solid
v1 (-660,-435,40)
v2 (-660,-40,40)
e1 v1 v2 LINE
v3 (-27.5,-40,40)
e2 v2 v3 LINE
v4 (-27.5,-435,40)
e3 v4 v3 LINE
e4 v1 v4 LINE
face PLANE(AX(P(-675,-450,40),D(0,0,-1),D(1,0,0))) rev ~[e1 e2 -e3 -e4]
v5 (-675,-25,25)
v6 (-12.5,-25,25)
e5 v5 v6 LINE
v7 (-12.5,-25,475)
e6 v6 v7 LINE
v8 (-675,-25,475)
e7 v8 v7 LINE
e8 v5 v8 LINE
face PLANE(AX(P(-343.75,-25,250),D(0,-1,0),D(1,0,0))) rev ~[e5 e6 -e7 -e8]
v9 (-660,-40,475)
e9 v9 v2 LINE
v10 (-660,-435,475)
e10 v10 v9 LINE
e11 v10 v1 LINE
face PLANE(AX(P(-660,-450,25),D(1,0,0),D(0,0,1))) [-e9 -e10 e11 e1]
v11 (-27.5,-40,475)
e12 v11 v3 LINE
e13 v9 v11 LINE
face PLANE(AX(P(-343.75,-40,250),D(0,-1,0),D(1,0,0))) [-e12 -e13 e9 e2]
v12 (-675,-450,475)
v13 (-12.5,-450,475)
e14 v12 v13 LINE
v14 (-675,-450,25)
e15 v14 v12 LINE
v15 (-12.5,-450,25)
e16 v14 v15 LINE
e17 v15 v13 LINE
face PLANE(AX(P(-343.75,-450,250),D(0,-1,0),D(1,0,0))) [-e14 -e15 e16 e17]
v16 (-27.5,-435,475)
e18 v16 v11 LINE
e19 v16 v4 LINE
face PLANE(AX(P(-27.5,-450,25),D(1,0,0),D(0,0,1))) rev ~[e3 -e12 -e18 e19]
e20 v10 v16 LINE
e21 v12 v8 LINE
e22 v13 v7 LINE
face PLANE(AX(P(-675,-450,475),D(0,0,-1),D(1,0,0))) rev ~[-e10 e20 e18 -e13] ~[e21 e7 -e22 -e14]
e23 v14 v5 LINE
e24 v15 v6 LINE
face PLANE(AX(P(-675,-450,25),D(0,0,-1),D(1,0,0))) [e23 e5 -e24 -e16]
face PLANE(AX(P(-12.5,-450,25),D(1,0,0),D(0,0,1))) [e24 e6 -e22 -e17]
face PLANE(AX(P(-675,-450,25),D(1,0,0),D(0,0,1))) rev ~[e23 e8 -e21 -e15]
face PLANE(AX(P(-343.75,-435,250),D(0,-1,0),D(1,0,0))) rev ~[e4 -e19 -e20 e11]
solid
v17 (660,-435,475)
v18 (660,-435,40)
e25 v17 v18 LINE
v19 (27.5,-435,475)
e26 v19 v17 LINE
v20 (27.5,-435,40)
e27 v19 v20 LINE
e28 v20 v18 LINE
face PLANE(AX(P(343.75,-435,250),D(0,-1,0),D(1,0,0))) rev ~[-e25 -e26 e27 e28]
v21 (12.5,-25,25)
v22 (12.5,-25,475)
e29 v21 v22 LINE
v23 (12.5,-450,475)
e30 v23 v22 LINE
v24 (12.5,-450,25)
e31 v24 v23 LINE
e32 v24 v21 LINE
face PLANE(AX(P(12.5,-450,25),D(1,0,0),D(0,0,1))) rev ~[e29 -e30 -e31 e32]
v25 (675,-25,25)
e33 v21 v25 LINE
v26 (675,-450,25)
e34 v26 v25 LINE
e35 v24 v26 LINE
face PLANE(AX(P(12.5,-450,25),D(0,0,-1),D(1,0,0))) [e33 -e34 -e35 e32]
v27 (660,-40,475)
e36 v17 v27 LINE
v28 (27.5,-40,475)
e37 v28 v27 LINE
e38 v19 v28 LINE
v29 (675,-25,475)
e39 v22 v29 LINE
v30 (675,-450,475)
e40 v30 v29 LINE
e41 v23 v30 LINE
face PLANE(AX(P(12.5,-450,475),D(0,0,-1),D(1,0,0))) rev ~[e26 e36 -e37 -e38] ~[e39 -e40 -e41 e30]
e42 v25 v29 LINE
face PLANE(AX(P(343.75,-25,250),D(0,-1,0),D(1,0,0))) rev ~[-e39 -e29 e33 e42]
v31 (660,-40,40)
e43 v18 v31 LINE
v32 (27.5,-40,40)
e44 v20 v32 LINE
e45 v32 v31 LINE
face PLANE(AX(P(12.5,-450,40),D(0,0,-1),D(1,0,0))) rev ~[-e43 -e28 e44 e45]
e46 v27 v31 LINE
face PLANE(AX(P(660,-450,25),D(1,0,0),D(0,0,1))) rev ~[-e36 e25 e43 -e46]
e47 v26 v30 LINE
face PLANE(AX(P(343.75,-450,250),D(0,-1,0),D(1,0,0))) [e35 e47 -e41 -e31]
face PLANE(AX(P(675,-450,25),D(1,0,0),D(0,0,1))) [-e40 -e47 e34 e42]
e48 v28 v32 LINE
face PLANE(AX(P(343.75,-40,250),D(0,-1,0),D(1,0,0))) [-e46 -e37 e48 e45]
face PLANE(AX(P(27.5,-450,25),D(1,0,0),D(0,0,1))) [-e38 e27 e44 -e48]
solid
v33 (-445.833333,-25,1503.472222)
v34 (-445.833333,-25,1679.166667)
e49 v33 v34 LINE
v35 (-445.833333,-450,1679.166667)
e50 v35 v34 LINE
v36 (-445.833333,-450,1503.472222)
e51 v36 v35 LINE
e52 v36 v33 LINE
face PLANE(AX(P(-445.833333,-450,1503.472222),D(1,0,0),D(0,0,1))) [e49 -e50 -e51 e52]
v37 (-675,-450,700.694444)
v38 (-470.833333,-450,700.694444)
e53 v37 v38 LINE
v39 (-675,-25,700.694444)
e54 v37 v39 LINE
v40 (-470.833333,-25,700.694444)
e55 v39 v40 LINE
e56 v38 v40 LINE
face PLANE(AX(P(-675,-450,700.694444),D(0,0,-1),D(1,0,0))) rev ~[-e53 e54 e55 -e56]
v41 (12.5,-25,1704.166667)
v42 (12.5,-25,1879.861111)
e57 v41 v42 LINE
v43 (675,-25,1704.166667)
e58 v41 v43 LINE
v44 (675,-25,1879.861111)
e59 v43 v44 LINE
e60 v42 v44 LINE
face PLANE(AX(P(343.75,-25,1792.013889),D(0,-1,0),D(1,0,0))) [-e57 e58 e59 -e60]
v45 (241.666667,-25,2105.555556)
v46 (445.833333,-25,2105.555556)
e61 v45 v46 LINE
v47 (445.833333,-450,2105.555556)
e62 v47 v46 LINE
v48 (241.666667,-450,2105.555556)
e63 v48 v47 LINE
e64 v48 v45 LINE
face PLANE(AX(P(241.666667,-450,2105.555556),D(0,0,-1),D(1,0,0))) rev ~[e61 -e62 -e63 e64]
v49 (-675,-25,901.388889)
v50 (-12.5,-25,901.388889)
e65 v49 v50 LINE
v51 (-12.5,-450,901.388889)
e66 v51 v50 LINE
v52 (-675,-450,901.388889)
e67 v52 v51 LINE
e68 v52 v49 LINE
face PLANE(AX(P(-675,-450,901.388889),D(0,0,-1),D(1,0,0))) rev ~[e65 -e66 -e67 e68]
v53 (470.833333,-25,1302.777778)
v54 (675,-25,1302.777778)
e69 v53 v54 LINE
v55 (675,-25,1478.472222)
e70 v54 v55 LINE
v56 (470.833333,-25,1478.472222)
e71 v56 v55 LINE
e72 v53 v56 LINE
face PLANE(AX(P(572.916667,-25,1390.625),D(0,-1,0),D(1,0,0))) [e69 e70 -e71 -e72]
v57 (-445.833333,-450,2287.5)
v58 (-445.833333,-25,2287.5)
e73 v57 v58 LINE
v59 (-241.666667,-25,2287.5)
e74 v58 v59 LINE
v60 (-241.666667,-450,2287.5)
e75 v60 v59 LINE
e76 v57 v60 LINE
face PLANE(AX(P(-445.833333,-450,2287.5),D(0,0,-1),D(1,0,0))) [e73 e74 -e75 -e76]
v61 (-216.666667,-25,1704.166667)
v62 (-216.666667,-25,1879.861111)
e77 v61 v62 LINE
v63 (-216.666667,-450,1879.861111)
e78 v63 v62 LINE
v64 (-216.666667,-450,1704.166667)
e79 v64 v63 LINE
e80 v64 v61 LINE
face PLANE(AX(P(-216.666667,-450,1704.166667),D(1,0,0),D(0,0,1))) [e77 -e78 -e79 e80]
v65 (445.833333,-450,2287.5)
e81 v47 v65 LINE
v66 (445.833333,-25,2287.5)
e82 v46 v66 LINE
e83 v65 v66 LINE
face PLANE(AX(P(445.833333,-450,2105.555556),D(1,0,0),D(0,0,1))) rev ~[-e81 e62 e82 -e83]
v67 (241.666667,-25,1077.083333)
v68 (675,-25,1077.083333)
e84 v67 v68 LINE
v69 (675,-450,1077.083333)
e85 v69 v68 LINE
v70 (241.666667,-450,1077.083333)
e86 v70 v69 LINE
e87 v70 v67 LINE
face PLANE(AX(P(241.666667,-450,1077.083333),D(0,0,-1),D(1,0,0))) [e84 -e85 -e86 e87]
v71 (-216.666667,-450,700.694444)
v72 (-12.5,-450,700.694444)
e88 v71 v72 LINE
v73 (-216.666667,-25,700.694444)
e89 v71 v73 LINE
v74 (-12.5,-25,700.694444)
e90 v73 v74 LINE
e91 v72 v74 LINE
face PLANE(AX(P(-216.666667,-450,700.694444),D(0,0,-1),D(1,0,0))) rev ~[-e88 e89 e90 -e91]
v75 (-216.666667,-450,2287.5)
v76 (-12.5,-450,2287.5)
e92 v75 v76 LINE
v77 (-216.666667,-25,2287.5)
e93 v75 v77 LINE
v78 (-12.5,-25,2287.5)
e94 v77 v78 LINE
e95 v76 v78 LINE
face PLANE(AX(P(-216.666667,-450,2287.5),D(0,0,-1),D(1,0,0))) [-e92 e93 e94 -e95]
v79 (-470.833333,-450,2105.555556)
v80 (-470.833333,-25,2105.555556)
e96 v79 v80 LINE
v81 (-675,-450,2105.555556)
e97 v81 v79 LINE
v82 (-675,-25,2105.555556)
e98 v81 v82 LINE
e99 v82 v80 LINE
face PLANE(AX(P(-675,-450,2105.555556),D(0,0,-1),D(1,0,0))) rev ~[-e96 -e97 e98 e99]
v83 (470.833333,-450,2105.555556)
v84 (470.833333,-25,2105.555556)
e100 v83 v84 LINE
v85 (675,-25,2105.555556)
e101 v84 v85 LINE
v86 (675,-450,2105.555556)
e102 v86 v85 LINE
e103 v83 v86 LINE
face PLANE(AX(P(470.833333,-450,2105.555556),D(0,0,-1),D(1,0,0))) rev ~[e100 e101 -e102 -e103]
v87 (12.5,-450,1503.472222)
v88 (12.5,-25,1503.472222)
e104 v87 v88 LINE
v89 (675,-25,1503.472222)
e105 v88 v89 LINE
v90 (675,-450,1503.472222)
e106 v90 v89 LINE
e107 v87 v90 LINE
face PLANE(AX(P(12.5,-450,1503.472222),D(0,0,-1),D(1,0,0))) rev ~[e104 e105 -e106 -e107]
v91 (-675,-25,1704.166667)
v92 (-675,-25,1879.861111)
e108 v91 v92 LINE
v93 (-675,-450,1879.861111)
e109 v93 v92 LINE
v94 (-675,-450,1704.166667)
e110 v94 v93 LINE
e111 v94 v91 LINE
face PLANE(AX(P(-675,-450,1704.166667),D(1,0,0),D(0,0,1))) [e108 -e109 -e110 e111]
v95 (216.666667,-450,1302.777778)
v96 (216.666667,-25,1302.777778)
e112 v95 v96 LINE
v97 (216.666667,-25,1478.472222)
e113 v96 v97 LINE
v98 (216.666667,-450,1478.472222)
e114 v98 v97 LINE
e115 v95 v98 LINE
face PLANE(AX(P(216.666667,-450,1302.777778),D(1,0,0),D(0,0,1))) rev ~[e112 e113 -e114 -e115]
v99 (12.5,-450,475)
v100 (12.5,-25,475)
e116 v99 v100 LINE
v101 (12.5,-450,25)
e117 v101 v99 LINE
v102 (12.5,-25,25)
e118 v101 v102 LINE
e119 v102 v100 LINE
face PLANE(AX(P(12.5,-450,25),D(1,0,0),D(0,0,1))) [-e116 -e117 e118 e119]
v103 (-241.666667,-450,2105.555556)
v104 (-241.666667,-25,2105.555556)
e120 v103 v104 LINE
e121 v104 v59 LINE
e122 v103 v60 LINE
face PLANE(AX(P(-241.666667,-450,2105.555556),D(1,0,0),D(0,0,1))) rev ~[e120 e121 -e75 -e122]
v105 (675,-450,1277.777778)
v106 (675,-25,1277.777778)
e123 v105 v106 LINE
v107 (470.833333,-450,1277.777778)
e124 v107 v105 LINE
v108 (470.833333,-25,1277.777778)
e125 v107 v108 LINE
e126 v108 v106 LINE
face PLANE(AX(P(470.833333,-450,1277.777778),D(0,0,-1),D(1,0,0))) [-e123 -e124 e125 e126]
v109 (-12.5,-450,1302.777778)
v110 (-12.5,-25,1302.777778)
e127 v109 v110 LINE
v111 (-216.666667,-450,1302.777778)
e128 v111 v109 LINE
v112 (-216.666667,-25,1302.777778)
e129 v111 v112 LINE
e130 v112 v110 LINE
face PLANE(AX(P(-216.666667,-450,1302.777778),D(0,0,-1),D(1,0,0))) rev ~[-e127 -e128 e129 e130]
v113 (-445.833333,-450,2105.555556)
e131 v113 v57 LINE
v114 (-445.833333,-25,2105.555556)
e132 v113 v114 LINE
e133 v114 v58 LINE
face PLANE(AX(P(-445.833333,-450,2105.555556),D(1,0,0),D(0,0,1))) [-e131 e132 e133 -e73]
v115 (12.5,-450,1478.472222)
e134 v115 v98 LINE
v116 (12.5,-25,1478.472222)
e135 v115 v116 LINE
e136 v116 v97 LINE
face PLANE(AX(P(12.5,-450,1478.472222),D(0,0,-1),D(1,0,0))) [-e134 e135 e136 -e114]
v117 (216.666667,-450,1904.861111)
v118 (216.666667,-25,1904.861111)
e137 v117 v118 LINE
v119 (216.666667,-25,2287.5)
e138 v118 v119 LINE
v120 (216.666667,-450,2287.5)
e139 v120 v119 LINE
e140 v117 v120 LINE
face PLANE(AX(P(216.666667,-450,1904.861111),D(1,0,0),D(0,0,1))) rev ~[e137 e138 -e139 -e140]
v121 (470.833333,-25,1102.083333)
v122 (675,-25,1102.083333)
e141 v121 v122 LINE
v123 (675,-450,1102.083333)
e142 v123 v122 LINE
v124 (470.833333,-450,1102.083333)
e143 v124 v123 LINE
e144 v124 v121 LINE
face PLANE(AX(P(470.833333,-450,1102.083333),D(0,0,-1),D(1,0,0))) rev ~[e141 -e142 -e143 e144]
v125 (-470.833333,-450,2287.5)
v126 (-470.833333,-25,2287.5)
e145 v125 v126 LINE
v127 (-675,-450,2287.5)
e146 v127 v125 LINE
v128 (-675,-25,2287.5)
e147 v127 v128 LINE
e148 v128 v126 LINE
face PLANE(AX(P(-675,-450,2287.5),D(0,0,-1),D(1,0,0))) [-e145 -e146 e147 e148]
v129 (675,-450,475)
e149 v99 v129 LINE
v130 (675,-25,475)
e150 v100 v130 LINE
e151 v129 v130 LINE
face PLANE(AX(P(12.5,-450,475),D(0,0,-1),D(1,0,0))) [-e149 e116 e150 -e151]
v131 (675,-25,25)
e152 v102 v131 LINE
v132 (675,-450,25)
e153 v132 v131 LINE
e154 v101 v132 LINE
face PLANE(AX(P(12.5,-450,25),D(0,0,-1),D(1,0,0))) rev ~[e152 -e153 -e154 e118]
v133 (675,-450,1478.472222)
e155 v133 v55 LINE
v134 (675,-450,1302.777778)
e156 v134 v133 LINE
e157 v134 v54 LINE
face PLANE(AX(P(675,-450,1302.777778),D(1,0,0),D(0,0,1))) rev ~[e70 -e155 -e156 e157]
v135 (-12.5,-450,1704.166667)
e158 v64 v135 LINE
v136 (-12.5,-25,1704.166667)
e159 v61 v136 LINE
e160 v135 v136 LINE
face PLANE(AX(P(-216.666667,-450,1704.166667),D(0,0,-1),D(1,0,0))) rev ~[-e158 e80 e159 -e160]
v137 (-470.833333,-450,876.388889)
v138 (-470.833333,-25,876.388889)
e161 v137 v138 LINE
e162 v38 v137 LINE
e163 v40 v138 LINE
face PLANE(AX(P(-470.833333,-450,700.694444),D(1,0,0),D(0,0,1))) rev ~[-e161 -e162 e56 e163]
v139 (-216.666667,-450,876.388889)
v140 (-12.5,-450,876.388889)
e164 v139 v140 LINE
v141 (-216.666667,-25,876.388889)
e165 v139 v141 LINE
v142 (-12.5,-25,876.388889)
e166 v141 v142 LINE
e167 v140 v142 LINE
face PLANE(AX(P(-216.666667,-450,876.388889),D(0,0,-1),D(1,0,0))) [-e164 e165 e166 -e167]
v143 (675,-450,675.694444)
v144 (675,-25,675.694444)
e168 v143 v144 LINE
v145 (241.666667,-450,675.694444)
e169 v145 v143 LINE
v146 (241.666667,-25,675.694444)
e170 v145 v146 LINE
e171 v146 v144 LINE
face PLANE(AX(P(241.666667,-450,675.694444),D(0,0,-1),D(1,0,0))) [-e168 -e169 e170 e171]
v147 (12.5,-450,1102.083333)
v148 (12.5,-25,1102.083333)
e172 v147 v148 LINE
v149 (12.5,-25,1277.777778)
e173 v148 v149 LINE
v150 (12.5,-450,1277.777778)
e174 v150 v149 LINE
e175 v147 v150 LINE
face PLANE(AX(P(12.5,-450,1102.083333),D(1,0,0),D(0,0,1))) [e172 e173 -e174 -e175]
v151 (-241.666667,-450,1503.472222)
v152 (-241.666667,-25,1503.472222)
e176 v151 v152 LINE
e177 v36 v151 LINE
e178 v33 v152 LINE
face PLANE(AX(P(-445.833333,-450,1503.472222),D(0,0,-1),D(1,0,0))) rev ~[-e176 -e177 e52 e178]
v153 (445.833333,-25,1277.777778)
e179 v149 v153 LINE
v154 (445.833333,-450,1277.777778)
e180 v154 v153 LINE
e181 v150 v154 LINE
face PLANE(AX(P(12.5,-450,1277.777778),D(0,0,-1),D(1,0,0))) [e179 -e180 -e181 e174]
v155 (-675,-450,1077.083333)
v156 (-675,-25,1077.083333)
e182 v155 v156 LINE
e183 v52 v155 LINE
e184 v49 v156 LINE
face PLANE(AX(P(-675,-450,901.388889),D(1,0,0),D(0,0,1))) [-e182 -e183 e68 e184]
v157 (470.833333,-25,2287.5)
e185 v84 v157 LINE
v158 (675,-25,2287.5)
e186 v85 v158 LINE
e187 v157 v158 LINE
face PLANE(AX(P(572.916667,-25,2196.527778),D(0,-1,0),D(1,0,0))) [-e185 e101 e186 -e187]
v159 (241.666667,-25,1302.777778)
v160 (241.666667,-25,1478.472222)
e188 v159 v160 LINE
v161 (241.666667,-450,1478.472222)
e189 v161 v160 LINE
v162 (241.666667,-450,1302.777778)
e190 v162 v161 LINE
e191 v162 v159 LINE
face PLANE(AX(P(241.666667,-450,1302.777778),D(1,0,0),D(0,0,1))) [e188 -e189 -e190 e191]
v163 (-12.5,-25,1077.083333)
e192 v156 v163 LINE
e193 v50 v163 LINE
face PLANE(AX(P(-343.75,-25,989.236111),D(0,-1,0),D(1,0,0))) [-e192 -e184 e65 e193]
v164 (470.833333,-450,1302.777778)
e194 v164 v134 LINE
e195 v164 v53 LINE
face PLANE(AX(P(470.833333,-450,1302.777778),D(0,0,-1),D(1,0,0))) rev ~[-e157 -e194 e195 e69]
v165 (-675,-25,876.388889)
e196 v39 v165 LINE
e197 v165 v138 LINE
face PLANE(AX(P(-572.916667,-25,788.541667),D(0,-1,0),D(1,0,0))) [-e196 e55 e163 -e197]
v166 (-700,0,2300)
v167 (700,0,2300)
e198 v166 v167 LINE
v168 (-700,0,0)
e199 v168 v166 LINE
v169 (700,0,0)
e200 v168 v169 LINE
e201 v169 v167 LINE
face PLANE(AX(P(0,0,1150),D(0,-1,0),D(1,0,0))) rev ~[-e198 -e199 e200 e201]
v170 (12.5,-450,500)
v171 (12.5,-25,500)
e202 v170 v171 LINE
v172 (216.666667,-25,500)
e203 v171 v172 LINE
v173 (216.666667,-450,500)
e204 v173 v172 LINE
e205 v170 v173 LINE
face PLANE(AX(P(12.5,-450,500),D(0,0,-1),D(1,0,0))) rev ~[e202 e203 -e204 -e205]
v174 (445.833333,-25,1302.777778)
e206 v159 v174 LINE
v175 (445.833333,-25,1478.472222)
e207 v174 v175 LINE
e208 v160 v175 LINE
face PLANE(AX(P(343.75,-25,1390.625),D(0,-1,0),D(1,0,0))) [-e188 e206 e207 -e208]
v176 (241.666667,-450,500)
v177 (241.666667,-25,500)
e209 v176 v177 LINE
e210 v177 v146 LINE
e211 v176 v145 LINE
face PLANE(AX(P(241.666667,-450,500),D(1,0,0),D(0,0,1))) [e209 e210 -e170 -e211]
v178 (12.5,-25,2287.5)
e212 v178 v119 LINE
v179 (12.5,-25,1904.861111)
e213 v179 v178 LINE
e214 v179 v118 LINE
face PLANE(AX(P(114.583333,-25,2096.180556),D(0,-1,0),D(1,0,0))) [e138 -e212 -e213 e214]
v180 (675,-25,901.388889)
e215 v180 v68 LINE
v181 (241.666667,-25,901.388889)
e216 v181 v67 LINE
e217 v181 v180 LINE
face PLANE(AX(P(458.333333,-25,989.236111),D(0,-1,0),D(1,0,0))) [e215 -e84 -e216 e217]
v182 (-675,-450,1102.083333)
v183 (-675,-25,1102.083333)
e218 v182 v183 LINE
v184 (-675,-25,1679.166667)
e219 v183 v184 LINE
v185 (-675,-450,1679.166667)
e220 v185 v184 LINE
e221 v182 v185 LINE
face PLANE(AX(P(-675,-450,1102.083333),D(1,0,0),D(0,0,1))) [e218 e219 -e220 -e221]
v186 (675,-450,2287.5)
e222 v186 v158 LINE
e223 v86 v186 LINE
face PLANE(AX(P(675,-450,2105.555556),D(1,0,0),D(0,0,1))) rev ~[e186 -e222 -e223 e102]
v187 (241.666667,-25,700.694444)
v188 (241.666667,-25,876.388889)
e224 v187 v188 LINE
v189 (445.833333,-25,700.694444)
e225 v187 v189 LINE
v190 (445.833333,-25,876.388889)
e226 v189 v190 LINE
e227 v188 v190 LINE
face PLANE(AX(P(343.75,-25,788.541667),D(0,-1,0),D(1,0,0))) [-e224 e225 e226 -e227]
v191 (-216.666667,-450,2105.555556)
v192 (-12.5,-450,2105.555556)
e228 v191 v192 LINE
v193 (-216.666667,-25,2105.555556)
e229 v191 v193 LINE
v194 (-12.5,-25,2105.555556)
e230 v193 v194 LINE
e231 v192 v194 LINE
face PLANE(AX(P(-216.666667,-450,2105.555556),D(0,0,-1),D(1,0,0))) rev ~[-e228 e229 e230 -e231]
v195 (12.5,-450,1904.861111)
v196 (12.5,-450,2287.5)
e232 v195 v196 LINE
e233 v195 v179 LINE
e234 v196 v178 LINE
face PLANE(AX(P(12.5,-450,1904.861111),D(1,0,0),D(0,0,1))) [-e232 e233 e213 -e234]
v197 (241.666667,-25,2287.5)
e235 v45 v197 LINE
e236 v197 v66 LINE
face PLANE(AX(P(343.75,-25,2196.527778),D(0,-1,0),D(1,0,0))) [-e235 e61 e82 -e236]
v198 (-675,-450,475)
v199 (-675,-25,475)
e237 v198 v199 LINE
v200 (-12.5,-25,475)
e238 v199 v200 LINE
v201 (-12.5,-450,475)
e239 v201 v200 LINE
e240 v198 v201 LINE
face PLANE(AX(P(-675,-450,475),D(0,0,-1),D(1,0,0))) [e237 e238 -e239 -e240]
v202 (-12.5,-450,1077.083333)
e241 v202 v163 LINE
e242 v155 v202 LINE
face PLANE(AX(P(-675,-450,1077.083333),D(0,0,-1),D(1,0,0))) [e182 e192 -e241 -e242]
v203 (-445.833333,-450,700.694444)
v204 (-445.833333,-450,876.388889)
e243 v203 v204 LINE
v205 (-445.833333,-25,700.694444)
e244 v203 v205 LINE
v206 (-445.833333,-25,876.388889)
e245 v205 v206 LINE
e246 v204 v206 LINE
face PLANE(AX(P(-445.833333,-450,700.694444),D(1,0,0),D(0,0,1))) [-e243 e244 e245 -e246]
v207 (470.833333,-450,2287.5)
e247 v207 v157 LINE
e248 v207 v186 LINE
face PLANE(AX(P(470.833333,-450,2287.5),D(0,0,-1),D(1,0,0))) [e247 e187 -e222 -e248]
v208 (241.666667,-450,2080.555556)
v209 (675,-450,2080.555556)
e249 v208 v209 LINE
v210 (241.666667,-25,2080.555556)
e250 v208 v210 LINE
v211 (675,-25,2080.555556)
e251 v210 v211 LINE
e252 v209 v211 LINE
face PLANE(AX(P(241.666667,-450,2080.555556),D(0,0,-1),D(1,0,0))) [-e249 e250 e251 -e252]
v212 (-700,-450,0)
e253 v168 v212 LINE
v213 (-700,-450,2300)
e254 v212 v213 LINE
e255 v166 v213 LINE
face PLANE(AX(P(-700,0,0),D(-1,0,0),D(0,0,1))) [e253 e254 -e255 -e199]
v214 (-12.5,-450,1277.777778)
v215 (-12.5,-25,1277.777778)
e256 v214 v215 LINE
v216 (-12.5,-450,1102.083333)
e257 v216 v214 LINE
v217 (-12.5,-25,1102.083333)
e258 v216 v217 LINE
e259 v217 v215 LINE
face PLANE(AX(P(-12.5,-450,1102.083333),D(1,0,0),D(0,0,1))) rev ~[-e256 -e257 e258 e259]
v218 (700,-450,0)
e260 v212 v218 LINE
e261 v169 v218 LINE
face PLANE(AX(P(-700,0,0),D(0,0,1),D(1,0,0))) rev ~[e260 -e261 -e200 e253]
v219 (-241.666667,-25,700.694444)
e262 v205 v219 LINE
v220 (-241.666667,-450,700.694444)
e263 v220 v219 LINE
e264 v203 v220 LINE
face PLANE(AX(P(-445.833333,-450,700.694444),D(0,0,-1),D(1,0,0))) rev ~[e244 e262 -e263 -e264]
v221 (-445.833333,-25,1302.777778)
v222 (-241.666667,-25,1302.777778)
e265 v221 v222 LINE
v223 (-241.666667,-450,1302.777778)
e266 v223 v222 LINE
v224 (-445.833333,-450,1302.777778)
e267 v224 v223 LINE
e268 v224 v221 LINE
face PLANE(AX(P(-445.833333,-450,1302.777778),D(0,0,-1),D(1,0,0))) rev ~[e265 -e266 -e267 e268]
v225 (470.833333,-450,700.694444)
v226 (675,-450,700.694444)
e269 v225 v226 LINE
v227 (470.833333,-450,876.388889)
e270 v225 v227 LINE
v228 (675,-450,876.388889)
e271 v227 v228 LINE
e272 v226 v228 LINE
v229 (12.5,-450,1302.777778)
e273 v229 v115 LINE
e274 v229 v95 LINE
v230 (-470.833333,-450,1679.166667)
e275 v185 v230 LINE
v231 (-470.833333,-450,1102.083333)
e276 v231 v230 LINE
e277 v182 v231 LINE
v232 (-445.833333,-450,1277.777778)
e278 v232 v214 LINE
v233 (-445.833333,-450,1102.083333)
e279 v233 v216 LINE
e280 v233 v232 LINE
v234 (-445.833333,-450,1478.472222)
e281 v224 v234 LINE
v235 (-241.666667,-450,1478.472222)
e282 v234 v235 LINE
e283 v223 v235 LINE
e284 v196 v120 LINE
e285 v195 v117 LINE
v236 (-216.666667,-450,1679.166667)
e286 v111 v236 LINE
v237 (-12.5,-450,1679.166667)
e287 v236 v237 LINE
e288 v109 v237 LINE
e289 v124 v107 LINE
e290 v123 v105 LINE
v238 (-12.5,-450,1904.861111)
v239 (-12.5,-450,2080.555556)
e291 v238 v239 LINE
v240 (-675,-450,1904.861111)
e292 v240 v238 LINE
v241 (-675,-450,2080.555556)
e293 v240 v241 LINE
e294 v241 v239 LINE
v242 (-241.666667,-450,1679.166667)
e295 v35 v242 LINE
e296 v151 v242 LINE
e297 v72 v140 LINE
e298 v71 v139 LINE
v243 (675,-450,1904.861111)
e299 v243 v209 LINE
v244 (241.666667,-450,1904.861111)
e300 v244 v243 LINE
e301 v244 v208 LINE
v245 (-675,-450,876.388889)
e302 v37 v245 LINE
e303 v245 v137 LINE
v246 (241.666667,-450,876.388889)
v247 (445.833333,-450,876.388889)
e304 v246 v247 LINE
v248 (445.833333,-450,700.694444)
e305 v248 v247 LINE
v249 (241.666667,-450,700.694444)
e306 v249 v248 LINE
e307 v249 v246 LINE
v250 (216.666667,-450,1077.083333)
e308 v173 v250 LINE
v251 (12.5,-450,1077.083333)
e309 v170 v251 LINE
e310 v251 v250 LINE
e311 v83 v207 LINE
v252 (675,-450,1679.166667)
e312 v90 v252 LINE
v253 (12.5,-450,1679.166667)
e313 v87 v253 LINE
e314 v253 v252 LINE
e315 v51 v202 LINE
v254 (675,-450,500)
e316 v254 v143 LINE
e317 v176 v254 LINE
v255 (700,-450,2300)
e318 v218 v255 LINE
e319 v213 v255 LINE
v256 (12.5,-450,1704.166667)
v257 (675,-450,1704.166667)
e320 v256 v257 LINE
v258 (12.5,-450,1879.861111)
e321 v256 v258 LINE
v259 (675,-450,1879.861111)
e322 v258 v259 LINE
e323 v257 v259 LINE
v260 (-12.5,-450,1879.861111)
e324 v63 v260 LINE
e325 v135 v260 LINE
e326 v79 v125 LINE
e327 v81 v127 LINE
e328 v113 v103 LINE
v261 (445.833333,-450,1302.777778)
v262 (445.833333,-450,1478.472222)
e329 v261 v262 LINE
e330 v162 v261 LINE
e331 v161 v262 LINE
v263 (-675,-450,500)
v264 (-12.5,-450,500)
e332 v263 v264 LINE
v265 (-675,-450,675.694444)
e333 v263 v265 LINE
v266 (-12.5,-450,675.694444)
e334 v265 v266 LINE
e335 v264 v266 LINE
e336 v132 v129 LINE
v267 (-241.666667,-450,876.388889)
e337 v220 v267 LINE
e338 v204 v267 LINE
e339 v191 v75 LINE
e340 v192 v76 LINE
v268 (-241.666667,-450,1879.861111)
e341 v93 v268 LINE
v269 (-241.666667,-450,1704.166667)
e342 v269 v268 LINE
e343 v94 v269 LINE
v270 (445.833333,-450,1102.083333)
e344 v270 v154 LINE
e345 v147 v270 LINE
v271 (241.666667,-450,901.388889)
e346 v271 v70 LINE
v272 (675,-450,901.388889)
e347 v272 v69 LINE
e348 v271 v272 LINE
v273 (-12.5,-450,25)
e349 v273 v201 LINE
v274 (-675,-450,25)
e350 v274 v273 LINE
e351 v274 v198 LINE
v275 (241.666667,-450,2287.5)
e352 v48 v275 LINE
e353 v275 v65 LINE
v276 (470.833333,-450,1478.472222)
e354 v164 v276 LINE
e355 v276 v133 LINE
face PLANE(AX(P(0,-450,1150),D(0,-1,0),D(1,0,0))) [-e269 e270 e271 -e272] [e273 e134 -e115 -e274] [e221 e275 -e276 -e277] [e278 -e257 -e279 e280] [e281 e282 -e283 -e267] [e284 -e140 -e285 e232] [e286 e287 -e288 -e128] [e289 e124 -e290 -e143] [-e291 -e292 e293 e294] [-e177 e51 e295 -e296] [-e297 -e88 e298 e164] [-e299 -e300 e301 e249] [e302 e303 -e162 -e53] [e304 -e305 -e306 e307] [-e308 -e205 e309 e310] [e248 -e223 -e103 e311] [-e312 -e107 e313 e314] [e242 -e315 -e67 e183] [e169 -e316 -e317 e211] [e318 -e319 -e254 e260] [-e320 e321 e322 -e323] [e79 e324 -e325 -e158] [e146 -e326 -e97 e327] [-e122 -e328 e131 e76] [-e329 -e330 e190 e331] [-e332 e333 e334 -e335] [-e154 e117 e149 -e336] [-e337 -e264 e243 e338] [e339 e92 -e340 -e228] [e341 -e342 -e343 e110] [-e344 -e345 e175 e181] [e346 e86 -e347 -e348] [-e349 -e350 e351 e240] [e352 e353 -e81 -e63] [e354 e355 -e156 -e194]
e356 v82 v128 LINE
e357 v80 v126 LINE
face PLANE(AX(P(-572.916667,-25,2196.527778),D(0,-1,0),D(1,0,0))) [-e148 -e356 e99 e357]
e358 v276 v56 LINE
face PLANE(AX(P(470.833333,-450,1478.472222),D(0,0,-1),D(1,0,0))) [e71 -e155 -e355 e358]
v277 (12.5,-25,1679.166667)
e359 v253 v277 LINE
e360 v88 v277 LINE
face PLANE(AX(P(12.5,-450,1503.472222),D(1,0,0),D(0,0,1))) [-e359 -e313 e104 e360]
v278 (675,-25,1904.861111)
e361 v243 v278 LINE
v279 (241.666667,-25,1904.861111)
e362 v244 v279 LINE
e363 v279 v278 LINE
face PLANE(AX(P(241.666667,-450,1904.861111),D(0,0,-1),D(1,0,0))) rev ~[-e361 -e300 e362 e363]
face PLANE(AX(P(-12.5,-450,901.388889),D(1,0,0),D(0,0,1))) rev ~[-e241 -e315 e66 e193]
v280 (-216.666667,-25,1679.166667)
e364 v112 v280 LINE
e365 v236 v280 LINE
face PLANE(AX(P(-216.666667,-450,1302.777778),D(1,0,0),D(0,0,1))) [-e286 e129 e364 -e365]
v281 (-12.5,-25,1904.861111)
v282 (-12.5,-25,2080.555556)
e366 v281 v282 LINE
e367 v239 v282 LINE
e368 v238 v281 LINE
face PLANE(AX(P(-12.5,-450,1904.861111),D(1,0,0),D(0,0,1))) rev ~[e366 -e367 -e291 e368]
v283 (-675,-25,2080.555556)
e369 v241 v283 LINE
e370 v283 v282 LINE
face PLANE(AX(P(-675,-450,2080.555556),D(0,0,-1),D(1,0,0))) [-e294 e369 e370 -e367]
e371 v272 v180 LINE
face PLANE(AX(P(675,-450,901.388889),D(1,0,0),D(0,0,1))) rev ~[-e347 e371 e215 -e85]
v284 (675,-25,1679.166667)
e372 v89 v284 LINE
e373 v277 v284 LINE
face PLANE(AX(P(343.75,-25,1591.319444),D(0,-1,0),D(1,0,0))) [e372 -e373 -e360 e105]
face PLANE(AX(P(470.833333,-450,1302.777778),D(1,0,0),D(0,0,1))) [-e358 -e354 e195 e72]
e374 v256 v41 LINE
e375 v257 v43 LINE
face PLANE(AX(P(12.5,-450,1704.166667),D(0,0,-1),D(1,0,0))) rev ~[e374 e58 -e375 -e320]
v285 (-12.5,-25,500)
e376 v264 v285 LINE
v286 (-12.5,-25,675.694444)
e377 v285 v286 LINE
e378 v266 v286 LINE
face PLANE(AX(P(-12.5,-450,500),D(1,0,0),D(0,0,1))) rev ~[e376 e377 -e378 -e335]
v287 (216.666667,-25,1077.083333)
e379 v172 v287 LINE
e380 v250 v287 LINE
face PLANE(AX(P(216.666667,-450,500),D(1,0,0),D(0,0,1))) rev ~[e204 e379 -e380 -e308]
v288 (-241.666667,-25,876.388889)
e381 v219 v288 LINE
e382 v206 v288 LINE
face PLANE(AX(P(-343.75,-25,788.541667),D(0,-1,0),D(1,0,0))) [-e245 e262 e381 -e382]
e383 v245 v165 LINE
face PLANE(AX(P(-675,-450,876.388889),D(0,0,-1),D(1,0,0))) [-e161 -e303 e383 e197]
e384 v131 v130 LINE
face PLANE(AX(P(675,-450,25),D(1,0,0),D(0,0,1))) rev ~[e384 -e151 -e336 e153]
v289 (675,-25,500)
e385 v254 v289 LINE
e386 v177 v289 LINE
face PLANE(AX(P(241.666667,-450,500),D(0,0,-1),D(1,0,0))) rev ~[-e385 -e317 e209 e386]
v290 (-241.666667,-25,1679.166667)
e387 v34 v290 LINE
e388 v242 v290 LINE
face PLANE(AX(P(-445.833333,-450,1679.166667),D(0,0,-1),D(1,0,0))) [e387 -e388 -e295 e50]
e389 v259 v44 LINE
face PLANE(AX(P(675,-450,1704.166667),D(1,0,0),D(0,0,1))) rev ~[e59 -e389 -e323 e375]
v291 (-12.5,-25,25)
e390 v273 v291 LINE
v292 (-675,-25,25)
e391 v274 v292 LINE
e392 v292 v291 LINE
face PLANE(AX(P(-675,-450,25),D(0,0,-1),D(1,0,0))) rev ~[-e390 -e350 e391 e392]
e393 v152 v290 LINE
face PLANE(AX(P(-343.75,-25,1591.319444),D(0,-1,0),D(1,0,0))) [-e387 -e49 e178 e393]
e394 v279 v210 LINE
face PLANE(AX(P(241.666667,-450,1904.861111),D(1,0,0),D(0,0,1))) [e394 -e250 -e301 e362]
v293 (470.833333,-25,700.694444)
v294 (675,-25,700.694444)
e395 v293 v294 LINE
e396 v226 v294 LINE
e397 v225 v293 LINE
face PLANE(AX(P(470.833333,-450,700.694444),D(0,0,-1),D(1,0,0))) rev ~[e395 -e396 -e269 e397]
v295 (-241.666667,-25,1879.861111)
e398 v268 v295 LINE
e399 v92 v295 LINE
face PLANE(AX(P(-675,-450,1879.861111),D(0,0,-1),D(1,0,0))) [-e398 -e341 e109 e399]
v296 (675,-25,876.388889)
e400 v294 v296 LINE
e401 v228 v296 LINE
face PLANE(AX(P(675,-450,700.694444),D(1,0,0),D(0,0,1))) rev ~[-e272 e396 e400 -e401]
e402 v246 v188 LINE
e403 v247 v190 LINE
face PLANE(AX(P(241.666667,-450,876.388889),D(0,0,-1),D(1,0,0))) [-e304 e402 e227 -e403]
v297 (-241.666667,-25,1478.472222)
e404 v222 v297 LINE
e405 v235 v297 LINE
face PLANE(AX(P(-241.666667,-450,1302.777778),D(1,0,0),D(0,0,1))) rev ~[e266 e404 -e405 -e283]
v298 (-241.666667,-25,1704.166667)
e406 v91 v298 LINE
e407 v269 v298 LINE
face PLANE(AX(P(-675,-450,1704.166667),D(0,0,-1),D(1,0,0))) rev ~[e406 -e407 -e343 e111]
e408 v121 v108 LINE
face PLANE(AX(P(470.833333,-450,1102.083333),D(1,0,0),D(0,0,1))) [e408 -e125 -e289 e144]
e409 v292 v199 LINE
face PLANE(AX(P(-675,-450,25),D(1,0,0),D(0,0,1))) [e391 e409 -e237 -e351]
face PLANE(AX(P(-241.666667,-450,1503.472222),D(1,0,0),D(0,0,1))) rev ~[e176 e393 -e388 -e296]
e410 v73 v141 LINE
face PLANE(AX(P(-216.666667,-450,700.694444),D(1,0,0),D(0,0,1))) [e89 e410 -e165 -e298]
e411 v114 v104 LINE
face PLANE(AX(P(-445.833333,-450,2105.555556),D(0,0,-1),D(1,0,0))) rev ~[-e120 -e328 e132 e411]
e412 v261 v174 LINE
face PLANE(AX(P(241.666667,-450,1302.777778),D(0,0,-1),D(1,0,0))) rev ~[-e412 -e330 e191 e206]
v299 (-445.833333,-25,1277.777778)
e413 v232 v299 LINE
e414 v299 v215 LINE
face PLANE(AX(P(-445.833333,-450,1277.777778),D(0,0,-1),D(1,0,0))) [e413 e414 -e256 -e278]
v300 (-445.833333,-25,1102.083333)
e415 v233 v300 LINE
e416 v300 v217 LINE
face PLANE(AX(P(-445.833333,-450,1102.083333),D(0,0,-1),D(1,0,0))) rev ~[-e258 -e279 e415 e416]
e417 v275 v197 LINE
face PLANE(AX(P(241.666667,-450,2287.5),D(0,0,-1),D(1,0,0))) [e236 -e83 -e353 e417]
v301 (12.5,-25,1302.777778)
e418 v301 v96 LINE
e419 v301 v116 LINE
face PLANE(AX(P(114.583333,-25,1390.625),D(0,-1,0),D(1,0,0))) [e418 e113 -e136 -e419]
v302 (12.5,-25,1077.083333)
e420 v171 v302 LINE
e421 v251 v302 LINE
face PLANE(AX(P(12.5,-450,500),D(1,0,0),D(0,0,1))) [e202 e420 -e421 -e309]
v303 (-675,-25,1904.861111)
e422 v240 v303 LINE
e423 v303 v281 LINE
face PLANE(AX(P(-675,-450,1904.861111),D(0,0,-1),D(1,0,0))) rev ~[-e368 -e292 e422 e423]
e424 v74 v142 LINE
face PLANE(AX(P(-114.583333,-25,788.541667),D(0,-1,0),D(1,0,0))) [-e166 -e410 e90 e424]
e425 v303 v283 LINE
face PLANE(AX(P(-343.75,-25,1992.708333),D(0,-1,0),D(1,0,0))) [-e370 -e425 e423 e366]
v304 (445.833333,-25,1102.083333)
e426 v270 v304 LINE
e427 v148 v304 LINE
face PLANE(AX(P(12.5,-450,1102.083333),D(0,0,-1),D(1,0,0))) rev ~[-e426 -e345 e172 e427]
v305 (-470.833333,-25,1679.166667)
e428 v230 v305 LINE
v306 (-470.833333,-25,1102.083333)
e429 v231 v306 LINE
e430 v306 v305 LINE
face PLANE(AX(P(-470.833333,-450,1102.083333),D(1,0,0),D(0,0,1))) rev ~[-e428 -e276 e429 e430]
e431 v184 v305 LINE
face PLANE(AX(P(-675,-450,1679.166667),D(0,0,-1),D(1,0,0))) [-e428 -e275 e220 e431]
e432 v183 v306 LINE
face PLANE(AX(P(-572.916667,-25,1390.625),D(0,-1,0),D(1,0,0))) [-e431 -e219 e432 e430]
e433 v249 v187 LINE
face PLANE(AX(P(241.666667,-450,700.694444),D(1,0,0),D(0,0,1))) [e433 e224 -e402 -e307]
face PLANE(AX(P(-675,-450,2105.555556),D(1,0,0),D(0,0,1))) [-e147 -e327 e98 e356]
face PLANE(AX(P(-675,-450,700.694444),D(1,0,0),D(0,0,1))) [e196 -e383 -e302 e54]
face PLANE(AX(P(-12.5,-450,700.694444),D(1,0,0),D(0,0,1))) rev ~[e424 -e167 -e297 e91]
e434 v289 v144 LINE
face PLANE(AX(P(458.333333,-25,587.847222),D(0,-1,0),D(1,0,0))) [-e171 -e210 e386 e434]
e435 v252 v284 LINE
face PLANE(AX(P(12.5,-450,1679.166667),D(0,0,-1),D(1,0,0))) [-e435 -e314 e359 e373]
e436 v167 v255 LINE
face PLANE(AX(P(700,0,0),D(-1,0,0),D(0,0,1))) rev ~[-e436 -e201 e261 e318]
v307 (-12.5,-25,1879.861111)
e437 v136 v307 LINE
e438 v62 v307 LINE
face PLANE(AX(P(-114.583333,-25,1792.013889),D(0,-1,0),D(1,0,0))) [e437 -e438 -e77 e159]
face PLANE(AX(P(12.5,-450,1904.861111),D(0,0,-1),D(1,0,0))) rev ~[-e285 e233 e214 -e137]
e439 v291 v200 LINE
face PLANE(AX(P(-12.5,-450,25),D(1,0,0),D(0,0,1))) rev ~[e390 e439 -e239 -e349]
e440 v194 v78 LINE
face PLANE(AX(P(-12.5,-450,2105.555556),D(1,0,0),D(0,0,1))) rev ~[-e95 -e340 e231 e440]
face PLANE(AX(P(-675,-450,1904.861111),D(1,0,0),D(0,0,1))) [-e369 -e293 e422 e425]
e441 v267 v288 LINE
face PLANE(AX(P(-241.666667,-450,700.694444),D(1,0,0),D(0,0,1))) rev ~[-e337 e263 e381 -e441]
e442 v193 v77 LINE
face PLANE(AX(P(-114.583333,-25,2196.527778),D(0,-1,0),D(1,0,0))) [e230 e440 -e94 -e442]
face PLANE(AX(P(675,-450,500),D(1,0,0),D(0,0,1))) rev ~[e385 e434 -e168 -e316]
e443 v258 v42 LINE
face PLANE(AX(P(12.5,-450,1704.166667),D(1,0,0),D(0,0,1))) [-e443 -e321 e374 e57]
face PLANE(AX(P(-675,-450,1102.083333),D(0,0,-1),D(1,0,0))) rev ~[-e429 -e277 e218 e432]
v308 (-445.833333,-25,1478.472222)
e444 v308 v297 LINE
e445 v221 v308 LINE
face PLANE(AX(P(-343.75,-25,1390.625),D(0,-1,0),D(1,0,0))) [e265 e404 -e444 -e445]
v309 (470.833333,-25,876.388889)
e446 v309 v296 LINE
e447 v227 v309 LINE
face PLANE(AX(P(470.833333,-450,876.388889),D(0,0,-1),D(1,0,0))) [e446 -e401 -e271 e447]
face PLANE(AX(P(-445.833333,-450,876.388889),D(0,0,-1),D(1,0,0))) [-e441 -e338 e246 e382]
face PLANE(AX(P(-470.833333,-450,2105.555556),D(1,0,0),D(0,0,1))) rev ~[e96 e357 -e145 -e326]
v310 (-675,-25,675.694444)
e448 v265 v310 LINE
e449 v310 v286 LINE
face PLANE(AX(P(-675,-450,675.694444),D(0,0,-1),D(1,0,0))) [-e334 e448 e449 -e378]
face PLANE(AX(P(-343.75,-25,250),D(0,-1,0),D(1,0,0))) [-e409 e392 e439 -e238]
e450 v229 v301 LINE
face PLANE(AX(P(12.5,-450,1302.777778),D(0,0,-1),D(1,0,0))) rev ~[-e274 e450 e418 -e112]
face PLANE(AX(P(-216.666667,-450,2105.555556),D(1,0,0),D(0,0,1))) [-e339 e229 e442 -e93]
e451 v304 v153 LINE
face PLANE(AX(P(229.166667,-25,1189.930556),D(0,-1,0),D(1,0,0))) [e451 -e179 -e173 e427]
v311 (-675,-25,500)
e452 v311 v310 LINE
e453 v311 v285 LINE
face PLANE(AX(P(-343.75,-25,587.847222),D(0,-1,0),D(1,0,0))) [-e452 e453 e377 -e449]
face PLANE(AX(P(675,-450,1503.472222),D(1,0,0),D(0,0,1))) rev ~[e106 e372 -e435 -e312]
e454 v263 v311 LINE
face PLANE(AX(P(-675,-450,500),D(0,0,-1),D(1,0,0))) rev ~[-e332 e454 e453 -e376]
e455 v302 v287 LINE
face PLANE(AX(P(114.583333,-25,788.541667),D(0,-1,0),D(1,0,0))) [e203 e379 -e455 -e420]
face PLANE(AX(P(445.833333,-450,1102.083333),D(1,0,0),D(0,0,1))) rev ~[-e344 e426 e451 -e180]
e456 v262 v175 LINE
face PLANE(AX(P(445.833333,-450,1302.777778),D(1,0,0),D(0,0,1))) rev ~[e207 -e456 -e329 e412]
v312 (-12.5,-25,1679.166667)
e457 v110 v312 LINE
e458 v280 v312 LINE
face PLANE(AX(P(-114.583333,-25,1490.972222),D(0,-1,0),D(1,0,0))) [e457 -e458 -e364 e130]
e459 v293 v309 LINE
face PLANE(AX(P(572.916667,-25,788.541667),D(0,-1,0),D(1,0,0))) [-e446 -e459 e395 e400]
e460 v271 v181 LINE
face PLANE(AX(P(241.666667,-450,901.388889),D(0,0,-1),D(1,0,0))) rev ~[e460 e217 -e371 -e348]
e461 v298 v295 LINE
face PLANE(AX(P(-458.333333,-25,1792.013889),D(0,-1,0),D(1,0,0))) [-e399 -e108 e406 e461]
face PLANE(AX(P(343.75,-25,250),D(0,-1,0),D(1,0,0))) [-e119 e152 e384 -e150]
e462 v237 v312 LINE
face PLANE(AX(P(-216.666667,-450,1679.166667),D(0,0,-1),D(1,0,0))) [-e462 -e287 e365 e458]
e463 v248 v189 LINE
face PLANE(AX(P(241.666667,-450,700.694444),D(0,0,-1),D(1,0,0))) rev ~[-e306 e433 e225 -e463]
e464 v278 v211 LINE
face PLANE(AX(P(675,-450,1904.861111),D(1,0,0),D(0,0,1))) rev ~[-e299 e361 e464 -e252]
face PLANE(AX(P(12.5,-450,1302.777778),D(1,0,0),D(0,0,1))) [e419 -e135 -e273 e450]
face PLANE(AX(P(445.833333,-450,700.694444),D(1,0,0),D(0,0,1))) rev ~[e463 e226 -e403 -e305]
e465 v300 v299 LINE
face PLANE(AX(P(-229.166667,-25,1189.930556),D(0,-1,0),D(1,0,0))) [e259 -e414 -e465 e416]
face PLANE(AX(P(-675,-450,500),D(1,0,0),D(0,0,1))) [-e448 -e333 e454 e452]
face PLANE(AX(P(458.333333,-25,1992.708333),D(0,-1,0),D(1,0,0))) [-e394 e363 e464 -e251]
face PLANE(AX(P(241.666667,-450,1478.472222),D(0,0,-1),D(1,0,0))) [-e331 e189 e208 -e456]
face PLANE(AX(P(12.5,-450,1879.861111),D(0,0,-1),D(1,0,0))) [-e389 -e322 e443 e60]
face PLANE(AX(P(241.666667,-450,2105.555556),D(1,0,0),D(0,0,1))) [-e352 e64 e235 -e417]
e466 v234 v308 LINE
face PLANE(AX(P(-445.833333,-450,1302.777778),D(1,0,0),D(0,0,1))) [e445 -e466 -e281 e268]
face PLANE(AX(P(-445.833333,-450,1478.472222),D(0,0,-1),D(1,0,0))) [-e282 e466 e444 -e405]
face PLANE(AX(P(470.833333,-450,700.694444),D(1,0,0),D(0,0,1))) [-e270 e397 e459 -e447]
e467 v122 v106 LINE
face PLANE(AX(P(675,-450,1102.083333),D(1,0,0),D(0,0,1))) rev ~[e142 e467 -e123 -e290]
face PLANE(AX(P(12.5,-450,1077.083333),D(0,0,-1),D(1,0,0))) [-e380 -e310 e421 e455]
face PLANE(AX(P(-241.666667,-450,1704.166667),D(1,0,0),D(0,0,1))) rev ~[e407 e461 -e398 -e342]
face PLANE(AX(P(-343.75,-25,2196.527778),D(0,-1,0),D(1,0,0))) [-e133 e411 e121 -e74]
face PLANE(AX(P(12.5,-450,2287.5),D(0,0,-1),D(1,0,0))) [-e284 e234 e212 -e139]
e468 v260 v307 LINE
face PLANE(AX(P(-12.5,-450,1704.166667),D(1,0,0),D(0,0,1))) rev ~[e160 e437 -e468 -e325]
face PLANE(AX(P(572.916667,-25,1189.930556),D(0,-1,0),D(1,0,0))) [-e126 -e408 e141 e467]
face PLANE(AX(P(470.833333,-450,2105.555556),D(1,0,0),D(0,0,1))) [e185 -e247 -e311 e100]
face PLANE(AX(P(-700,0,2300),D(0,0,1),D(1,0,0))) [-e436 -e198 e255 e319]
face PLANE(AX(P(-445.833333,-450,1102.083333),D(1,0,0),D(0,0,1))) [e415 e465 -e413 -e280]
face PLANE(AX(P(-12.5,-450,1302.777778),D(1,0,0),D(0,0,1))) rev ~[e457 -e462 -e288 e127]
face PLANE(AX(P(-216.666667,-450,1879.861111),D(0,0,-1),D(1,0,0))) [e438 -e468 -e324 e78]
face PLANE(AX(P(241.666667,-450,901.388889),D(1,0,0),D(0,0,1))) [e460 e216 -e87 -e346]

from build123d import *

# Parameters (mm, degrees)
F0_W     = 1400
F0_H     = 2300
F1_DEPTH = 450
F2_W     = 204.1666666667
F2_H     = 181.9444444444
F2_H_2   = 382.6388888889
F2_W_2   = 662.5
F2_H_3   = 175.6944444444
F2_W_3   = 433.3333333333
F2_H_4   = 577.0833333333
F2_H_5   = 376.3888888889
F2_H_6   = 450
F3_DEPTH = 425
F4_DEPTH = 425
F5_T     = -15
F5_2_T   = -15


with BuildPart() as f1:
    # F0 (on Front) → F1 (new body)
    with BuildSketch(Plane.XZ):
        with Locations((0, 1150)):
            Rectangle(F0_W, F0_H)
    extrude(amount=F1_DEPTH)

    # F2 (on face) → F3 (cut, through all)
    with BuildSketch(Plane.XZ.offset(450)):
        with Locations((-572.9166666667, 2196.5277777778)):
            Rectangle(F2_W, F2_H)
        with Locations((-343.75, 2196.5277777778)):
            Rectangle(F2_W, F2_H)
        with Locations((-114.5833333333, 2196.5277777778)):
            Rectangle(F2_W, F2_H)
        with Locations((114.5833333333, 2096.1805555556)):
            Rectangle(F2_W, F2_H_2)
        with Locations((343.75, 2196.5277777778)):
            Rectangle(F2_W, F2_H)
        with Locations((572.9166666667, 2196.5277777778)):
            Rectangle(F2_W, F2_H)
        with Locations((-343.75, 1992.7083333333)):
            Rectangle(F2_W_2, F2_H_3)
        with Locations((458.3333333333, 1992.7083333333)):
            Rectangle(F2_W_3, F2_H_3)
        with Locations((-458.3333333333, 1792.0138888889)):
            Rectangle(F2_W_3, F2_H_3)
        with Locations((-114.5833333333, 1792.0138888889)):
            Rectangle(F2_W, F2_H_3)
        with Locations((343.75, 1792.0138888889)):
            Rectangle(F2_W_2, F2_H_3)
        with Locations((-572.9166666667, 1390.625)):
            Rectangle(F2_W, F2_H_4)
        with Locations((-343.75, 1591.3194444444)):
            Rectangle(F2_W, F2_H_3)
        with Locations((-343.75, 1390.625)):
            Rectangle(F2_W, F2_H_3)
        with Locations((-229.1666666667, 1189.9305555556)):
            Rectangle(F2_W_3, F2_H_3)
        with Locations((-114.5833333333, 1490.9722222222)):
            Rectangle(F2_W, F2_H_5)
        with Locations((343.75, 1591.3194444444)):
            Rectangle(F2_W_2, F2_H_3)
        with Locations((114.5833333333, 1390.625)):
            Rectangle(F2_W, F2_H_3)
        with Locations((343.75, 1390.625)):
            Rectangle(F2_W, F2_H_3)
        with Locations((572.9166666667, 1390.625)):
            Rectangle(F2_W, F2_H_3)
        with Locations((229.1666666667, 1189.9305555556)):
            Rectangle(F2_W_3, F2_H_3)
        with Locations((572.9166666667, 1189.9305555556)):
            Rectangle(F2_W, F2_H_3)
        with Locations((-343.75, 989.2361111111)):
            Rectangle(F2_W_2, F2_H_3)
        with Locations((-572.9166666667, 788.5416666667)):
            Rectangle(F2_W, F2_H_3)
        with Locations((-343.75, 788.5416666667)):
            Rectangle(F2_W, F2_H_3)
        with Locations((-114.5833333333, 788.5416666667)):
            Rectangle(F2_W, F2_H_3)
        with Locations((-343.75, 587.8472222222)):
            Rectangle(F2_W_2, F2_H_3)
        with Locations((114.5833333333, 788.5416666667)):
            Rectangle(F2_W, F2_H_4)
        with Locations((458.3333333333, 989.2361111111)):
            Rectangle(F2_W_3, F2_H_3)
        with Locations((343.75, 788.5416666667)):
            Rectangle(F2_W, F2_H_3)
        with Locations((572.9166666667, 788.5416666667)):
            Rectangle(F2_W, F2_H_3)
        with Locations((458.3333333333, 587.8472222222)):
            Rectangle(F2_W_3, F2_H_3)
        with Locations((-343.75, 250)):
            Rectangle(F2_W_2, F2_H_6)
        with Locations((343.75, 250)):
            Rectangle(F2_W_2, F2_H_6)
    extrude(amount=-F3_DEPTH, mode=Mode.SUBTRACT)


with BuildPart() as f4:
    # F2 (on face) → F4 (new body, through all)
    with BuildSketch(Plane.XZ.offset(450)):
        with Locations((-343.75, 250)):
            Rectangle(F2_W_2, F2_H_6)
    extrude(amount=-F4_DEPTH)

    # F5
    f5_openings = [f4.faces().sort_by_distance(p)[0] for p in [
        (-343.75, -237.5, 475),
    ]]
    offset(amount=F5_T, openings=f5_openings)


with BuildPart() as f4b:
    # F2 (on face) → F4, piece 2 (new body, through all)
    with BuildSketch(Plane.XZ.offset(450)):
        with Locations((343.75, 250)):
            Rectangle(F2_W_2, F2_H_6)
    extrude(amount=-F4_DEPTH)

    # F5#2
    f5_2_openings = [f4b.faces().sort_by_distance(p)[0] for p in [
        (343.75, -237.5, 475),
    ]]
    offset(amount=F5_2_T, openings=f5_2_openings)


solid = Compound([f1.part, f4.part, f4b.part])
